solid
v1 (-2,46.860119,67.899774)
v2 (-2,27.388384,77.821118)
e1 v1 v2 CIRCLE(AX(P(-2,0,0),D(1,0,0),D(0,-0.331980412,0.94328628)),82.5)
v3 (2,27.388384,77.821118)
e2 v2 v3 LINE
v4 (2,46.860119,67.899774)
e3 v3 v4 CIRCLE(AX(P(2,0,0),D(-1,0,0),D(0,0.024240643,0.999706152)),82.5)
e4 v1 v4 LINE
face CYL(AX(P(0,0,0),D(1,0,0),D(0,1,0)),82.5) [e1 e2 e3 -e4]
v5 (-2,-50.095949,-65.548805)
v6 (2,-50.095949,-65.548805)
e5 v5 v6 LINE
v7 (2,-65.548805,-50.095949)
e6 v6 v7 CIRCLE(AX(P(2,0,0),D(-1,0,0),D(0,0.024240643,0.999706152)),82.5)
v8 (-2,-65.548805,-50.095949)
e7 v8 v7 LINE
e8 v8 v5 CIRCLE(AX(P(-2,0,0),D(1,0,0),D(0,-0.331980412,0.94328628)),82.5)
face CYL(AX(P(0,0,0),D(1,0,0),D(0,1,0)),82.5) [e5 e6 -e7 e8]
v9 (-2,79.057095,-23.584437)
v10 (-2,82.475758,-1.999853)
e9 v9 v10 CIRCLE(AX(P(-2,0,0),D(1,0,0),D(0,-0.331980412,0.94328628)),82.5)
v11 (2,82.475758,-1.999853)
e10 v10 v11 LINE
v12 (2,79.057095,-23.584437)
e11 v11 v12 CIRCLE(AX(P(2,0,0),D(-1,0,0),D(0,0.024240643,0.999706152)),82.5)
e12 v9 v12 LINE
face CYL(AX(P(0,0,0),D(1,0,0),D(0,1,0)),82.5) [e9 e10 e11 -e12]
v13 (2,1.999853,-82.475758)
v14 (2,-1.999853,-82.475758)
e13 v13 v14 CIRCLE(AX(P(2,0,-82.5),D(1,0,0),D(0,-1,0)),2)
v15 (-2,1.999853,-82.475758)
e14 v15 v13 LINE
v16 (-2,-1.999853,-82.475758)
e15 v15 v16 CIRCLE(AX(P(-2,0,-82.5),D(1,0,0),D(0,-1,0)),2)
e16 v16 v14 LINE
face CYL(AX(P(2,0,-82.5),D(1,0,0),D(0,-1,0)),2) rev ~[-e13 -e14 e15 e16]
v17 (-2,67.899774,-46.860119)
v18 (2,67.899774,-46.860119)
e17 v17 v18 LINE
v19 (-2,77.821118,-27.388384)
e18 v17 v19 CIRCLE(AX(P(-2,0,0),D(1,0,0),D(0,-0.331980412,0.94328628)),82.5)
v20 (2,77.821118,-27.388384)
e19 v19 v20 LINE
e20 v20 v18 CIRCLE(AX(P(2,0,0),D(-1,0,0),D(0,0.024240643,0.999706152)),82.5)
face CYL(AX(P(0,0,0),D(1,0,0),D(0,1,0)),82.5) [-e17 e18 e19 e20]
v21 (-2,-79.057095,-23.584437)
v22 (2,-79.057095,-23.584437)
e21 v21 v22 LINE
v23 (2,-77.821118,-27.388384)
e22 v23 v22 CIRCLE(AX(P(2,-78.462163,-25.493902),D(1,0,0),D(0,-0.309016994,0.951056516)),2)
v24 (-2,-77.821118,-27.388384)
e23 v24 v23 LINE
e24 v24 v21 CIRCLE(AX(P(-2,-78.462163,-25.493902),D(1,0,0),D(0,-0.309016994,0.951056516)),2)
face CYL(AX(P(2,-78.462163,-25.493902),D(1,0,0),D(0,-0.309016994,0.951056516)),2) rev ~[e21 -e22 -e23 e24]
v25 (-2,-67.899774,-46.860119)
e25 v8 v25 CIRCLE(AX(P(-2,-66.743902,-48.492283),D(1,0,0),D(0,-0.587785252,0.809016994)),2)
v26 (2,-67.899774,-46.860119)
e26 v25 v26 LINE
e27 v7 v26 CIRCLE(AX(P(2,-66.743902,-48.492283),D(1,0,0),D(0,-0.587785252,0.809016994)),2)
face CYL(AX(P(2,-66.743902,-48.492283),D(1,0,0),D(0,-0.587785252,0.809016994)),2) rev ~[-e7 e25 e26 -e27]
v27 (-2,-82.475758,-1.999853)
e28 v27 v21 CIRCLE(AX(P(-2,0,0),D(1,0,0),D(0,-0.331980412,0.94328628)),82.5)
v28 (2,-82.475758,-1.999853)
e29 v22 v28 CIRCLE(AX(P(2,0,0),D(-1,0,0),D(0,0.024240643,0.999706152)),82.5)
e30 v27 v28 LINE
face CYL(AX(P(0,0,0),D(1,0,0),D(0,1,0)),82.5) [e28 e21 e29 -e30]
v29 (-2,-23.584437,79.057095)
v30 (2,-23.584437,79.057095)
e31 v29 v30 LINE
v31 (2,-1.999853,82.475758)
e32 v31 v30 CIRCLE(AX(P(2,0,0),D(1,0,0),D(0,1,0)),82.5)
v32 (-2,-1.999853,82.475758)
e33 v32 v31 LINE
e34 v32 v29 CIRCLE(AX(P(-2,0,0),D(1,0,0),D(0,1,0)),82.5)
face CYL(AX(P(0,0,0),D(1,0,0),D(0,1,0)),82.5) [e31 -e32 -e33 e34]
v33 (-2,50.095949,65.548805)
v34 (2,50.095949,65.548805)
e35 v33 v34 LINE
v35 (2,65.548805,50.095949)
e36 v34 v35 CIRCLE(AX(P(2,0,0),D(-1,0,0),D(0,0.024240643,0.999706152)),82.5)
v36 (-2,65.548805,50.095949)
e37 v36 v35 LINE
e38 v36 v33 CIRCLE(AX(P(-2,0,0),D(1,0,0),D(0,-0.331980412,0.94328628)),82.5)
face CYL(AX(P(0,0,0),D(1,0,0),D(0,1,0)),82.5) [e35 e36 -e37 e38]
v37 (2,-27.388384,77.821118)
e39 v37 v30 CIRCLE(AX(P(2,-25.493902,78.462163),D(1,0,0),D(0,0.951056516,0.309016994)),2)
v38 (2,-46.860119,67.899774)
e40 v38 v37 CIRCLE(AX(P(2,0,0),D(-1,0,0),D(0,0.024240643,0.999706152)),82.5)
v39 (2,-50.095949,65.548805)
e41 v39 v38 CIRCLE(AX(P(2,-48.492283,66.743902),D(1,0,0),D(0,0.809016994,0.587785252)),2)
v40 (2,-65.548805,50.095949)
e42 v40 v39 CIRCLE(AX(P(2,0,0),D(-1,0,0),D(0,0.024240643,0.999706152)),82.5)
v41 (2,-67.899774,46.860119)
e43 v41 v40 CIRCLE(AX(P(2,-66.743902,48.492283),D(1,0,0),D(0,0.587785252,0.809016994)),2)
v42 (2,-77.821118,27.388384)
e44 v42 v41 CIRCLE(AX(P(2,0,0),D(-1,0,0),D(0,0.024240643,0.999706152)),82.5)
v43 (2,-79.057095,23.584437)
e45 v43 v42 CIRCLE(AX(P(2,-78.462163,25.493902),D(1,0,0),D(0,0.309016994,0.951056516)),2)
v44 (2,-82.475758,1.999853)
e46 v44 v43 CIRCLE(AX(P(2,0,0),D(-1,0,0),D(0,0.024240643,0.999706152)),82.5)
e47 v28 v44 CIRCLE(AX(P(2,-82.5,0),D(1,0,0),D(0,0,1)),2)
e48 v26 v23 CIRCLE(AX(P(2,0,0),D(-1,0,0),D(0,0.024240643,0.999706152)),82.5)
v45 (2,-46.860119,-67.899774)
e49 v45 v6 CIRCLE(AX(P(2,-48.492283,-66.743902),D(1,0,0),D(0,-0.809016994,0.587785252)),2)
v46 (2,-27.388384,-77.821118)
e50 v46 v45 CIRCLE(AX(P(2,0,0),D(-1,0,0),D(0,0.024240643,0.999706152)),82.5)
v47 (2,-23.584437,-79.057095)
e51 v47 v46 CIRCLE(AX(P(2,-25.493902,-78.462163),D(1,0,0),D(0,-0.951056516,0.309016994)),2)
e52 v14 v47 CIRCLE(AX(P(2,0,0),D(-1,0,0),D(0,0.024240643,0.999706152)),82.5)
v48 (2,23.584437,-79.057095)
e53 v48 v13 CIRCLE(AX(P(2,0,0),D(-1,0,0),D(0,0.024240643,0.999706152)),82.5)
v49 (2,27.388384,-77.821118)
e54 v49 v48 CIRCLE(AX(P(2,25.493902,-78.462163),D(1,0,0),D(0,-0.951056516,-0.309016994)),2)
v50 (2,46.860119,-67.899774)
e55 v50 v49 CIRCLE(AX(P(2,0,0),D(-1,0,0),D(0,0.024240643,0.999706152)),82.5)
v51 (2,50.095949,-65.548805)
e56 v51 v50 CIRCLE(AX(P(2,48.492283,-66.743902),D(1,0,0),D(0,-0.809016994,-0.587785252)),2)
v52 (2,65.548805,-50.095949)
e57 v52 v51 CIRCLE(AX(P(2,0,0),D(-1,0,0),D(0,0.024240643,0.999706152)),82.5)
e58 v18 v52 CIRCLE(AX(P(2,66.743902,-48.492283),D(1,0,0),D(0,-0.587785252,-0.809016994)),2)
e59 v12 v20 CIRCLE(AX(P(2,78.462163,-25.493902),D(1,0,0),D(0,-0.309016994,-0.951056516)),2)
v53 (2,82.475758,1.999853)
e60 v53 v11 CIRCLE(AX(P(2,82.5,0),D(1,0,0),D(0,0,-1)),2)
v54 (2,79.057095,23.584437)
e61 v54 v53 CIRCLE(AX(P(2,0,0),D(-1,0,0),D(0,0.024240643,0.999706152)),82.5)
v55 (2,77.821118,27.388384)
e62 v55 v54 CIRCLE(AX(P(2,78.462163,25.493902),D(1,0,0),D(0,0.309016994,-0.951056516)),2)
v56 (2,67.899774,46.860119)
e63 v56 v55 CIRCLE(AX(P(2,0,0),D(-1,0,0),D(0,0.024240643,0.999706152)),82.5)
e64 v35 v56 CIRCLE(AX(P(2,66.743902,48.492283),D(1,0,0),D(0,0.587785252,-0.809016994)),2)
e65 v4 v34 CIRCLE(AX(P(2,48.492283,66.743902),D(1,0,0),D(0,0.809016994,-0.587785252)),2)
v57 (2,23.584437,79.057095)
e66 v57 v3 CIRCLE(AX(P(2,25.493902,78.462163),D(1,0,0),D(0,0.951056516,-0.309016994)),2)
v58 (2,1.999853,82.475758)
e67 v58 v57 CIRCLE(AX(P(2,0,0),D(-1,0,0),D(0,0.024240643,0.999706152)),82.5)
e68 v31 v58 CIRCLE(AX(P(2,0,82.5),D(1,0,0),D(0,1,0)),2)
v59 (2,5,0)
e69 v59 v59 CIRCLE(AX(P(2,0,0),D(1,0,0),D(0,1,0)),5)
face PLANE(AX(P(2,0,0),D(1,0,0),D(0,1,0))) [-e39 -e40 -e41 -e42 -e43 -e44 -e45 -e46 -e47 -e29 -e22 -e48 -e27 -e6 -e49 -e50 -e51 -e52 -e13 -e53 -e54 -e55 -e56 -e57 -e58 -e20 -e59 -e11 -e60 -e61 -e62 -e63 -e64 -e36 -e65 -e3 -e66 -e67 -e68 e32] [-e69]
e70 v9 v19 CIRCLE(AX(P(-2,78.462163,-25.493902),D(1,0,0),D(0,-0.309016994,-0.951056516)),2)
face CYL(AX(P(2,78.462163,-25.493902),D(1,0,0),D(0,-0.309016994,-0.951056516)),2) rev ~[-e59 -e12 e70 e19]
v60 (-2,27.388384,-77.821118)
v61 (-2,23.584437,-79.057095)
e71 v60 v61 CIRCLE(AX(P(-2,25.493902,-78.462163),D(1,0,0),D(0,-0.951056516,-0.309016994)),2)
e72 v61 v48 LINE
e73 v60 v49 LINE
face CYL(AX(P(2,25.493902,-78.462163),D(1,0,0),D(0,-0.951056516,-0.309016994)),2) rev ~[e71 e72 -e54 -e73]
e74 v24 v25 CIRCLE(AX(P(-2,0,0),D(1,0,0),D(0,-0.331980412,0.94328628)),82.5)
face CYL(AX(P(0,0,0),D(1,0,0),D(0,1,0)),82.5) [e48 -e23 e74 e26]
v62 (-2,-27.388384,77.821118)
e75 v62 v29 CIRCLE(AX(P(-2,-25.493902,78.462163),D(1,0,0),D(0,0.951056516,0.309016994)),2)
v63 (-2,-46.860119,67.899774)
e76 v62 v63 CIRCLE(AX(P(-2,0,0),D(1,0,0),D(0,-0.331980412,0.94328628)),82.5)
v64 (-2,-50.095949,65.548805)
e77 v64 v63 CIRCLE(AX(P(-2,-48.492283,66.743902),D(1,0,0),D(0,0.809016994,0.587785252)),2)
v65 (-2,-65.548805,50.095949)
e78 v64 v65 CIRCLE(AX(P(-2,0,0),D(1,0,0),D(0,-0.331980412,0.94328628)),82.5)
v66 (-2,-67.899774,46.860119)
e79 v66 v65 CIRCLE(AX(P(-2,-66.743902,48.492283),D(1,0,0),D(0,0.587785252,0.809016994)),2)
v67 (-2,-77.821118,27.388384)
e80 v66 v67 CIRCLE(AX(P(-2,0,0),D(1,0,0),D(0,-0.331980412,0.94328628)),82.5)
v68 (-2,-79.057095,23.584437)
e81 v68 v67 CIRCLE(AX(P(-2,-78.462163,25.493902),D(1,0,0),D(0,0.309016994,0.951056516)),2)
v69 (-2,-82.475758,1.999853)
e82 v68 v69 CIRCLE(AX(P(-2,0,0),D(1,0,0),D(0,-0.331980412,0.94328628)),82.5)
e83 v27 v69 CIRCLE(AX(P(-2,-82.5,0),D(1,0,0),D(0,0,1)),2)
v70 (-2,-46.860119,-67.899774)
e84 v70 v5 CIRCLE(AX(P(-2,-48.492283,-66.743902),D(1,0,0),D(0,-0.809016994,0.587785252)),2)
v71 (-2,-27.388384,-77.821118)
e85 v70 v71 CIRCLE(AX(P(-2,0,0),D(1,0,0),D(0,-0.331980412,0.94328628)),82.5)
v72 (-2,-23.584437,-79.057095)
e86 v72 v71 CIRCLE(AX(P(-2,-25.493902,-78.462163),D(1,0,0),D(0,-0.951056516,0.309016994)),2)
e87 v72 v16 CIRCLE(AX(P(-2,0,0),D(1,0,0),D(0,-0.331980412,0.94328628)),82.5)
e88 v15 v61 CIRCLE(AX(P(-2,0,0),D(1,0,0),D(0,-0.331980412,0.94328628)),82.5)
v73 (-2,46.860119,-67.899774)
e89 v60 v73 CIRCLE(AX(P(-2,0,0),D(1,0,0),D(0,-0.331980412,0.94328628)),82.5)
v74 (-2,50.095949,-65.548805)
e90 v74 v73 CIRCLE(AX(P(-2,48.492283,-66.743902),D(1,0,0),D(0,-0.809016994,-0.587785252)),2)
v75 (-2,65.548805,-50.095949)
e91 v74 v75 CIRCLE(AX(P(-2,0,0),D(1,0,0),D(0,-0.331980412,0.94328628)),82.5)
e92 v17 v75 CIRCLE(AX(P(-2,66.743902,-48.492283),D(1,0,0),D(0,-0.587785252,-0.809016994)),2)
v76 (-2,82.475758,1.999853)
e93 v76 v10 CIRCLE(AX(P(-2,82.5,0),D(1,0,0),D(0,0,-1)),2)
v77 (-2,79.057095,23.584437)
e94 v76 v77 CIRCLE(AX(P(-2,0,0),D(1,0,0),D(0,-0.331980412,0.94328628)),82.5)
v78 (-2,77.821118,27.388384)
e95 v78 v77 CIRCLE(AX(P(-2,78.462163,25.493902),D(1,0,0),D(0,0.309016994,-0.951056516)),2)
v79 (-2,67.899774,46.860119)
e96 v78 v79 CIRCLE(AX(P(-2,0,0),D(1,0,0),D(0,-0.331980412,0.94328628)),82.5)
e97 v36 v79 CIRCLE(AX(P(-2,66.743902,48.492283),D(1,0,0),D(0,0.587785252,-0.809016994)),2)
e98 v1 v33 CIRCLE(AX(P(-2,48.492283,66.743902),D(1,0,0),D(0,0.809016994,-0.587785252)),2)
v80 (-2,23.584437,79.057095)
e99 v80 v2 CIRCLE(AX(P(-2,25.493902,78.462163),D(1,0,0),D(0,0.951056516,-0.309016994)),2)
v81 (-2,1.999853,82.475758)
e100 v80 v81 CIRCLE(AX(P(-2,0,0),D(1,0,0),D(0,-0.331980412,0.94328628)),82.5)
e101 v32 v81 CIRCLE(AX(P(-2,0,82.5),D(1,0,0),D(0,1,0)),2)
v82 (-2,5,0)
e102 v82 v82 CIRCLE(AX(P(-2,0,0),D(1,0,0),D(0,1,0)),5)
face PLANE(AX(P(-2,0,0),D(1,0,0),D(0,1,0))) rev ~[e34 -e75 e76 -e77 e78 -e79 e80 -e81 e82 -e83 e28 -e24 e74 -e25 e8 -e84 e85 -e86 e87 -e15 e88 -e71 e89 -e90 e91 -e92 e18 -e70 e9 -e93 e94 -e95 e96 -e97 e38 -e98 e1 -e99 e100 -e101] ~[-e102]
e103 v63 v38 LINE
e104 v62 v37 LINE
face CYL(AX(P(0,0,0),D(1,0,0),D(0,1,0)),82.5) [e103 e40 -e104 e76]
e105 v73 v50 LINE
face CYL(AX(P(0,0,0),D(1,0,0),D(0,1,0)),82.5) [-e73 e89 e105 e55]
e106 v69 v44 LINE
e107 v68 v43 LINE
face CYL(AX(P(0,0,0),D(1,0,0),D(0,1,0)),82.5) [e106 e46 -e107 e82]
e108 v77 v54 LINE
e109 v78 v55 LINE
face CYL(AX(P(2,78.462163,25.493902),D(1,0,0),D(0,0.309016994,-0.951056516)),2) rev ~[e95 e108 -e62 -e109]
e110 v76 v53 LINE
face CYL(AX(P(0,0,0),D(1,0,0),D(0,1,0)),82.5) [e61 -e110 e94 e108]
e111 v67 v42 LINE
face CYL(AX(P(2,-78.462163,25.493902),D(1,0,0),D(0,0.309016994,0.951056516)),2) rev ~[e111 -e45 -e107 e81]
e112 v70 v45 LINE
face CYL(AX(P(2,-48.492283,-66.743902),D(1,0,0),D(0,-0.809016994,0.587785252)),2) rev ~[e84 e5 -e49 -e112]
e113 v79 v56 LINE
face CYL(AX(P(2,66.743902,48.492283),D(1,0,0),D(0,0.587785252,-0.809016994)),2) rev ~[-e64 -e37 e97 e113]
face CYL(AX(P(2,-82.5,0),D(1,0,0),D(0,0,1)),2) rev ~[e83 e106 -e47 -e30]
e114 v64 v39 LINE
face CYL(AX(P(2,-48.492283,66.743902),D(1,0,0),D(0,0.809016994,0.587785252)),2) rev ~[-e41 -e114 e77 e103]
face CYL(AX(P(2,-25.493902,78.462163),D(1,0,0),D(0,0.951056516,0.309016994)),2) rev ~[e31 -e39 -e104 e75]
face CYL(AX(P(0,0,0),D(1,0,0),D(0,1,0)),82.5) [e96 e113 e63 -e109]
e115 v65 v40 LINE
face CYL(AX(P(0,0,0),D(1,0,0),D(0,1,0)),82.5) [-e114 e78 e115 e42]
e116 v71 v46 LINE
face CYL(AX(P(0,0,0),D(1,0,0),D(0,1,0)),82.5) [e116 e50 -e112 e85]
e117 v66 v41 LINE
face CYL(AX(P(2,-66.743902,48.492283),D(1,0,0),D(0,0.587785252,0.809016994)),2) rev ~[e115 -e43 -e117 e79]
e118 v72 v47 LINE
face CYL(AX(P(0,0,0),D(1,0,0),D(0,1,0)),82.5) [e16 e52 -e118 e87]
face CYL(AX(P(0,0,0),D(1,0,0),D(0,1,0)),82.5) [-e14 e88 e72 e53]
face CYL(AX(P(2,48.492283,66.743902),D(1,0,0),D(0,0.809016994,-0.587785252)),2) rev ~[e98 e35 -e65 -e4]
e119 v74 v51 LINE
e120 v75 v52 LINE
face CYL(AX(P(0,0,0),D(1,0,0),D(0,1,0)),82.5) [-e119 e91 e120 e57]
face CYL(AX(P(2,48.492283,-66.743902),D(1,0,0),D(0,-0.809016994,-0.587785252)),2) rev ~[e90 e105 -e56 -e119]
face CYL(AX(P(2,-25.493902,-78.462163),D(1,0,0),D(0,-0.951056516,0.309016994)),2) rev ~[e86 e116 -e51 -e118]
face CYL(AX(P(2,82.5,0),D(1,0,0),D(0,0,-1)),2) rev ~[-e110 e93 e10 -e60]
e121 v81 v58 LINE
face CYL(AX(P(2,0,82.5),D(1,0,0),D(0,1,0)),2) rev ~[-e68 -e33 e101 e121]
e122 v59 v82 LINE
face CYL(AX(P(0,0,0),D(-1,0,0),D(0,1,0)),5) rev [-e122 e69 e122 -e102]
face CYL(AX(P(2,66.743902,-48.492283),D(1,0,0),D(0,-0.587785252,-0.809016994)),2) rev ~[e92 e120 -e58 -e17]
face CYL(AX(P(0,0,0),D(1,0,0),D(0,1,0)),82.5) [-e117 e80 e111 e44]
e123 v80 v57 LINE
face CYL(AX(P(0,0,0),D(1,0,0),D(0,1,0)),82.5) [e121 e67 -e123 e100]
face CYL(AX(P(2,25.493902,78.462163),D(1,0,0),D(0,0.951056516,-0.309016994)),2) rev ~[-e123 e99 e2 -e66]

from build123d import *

# Parameters (mm, degrees)
F0_R            = 82.5
F0_R_2          = 5
F1_DEPTH        = 2
F1_DEPTH_BACK   = 2
F2_R            = 2
F3_DEPTH        = 4.001
F3_COPIES_COUNT = 20


# Not quite as in the source:
# - a pattern or mirror of a feature is missing from the dataset's text; its kind, count and spacing are read off the source's solid


with BuildPart() as f1:
    # F0 (on Right) → F1 (new body, two sides)
    with BuildSketch(Plane.YZ) as f1_sk:
        Circle(F0_R)
        Circle(F0_R_2, mode=Mode.SUBTRACT)
    extrude(amount=F1_DEPTH)
    extrude(f1_sk.sketch, amount=-F1_DEPTH_BACK)

    # F2 (on face) → F3 (cut, through all)
    with BuildSketch(Plane.YZ.offset(2)):
        with Locations((0, 82.5)):
            Circle(F2_R)
    f3 = extrude(amount=-F3_DEPTH, mode=Mode.SUBTRACT)

    # F3_copies: F3 ×20 about axis
    f3_copies_axis = Axis((0, 0, 0), (1, 0, 0))
    for i in range(1, F3_COPIES_COUNT):
        add(f3.rotate(f3_copies_axis, i * 360 / F3_COPIES_COUNT), mode=Mode.SUBTRACT)


solid = f1.part
